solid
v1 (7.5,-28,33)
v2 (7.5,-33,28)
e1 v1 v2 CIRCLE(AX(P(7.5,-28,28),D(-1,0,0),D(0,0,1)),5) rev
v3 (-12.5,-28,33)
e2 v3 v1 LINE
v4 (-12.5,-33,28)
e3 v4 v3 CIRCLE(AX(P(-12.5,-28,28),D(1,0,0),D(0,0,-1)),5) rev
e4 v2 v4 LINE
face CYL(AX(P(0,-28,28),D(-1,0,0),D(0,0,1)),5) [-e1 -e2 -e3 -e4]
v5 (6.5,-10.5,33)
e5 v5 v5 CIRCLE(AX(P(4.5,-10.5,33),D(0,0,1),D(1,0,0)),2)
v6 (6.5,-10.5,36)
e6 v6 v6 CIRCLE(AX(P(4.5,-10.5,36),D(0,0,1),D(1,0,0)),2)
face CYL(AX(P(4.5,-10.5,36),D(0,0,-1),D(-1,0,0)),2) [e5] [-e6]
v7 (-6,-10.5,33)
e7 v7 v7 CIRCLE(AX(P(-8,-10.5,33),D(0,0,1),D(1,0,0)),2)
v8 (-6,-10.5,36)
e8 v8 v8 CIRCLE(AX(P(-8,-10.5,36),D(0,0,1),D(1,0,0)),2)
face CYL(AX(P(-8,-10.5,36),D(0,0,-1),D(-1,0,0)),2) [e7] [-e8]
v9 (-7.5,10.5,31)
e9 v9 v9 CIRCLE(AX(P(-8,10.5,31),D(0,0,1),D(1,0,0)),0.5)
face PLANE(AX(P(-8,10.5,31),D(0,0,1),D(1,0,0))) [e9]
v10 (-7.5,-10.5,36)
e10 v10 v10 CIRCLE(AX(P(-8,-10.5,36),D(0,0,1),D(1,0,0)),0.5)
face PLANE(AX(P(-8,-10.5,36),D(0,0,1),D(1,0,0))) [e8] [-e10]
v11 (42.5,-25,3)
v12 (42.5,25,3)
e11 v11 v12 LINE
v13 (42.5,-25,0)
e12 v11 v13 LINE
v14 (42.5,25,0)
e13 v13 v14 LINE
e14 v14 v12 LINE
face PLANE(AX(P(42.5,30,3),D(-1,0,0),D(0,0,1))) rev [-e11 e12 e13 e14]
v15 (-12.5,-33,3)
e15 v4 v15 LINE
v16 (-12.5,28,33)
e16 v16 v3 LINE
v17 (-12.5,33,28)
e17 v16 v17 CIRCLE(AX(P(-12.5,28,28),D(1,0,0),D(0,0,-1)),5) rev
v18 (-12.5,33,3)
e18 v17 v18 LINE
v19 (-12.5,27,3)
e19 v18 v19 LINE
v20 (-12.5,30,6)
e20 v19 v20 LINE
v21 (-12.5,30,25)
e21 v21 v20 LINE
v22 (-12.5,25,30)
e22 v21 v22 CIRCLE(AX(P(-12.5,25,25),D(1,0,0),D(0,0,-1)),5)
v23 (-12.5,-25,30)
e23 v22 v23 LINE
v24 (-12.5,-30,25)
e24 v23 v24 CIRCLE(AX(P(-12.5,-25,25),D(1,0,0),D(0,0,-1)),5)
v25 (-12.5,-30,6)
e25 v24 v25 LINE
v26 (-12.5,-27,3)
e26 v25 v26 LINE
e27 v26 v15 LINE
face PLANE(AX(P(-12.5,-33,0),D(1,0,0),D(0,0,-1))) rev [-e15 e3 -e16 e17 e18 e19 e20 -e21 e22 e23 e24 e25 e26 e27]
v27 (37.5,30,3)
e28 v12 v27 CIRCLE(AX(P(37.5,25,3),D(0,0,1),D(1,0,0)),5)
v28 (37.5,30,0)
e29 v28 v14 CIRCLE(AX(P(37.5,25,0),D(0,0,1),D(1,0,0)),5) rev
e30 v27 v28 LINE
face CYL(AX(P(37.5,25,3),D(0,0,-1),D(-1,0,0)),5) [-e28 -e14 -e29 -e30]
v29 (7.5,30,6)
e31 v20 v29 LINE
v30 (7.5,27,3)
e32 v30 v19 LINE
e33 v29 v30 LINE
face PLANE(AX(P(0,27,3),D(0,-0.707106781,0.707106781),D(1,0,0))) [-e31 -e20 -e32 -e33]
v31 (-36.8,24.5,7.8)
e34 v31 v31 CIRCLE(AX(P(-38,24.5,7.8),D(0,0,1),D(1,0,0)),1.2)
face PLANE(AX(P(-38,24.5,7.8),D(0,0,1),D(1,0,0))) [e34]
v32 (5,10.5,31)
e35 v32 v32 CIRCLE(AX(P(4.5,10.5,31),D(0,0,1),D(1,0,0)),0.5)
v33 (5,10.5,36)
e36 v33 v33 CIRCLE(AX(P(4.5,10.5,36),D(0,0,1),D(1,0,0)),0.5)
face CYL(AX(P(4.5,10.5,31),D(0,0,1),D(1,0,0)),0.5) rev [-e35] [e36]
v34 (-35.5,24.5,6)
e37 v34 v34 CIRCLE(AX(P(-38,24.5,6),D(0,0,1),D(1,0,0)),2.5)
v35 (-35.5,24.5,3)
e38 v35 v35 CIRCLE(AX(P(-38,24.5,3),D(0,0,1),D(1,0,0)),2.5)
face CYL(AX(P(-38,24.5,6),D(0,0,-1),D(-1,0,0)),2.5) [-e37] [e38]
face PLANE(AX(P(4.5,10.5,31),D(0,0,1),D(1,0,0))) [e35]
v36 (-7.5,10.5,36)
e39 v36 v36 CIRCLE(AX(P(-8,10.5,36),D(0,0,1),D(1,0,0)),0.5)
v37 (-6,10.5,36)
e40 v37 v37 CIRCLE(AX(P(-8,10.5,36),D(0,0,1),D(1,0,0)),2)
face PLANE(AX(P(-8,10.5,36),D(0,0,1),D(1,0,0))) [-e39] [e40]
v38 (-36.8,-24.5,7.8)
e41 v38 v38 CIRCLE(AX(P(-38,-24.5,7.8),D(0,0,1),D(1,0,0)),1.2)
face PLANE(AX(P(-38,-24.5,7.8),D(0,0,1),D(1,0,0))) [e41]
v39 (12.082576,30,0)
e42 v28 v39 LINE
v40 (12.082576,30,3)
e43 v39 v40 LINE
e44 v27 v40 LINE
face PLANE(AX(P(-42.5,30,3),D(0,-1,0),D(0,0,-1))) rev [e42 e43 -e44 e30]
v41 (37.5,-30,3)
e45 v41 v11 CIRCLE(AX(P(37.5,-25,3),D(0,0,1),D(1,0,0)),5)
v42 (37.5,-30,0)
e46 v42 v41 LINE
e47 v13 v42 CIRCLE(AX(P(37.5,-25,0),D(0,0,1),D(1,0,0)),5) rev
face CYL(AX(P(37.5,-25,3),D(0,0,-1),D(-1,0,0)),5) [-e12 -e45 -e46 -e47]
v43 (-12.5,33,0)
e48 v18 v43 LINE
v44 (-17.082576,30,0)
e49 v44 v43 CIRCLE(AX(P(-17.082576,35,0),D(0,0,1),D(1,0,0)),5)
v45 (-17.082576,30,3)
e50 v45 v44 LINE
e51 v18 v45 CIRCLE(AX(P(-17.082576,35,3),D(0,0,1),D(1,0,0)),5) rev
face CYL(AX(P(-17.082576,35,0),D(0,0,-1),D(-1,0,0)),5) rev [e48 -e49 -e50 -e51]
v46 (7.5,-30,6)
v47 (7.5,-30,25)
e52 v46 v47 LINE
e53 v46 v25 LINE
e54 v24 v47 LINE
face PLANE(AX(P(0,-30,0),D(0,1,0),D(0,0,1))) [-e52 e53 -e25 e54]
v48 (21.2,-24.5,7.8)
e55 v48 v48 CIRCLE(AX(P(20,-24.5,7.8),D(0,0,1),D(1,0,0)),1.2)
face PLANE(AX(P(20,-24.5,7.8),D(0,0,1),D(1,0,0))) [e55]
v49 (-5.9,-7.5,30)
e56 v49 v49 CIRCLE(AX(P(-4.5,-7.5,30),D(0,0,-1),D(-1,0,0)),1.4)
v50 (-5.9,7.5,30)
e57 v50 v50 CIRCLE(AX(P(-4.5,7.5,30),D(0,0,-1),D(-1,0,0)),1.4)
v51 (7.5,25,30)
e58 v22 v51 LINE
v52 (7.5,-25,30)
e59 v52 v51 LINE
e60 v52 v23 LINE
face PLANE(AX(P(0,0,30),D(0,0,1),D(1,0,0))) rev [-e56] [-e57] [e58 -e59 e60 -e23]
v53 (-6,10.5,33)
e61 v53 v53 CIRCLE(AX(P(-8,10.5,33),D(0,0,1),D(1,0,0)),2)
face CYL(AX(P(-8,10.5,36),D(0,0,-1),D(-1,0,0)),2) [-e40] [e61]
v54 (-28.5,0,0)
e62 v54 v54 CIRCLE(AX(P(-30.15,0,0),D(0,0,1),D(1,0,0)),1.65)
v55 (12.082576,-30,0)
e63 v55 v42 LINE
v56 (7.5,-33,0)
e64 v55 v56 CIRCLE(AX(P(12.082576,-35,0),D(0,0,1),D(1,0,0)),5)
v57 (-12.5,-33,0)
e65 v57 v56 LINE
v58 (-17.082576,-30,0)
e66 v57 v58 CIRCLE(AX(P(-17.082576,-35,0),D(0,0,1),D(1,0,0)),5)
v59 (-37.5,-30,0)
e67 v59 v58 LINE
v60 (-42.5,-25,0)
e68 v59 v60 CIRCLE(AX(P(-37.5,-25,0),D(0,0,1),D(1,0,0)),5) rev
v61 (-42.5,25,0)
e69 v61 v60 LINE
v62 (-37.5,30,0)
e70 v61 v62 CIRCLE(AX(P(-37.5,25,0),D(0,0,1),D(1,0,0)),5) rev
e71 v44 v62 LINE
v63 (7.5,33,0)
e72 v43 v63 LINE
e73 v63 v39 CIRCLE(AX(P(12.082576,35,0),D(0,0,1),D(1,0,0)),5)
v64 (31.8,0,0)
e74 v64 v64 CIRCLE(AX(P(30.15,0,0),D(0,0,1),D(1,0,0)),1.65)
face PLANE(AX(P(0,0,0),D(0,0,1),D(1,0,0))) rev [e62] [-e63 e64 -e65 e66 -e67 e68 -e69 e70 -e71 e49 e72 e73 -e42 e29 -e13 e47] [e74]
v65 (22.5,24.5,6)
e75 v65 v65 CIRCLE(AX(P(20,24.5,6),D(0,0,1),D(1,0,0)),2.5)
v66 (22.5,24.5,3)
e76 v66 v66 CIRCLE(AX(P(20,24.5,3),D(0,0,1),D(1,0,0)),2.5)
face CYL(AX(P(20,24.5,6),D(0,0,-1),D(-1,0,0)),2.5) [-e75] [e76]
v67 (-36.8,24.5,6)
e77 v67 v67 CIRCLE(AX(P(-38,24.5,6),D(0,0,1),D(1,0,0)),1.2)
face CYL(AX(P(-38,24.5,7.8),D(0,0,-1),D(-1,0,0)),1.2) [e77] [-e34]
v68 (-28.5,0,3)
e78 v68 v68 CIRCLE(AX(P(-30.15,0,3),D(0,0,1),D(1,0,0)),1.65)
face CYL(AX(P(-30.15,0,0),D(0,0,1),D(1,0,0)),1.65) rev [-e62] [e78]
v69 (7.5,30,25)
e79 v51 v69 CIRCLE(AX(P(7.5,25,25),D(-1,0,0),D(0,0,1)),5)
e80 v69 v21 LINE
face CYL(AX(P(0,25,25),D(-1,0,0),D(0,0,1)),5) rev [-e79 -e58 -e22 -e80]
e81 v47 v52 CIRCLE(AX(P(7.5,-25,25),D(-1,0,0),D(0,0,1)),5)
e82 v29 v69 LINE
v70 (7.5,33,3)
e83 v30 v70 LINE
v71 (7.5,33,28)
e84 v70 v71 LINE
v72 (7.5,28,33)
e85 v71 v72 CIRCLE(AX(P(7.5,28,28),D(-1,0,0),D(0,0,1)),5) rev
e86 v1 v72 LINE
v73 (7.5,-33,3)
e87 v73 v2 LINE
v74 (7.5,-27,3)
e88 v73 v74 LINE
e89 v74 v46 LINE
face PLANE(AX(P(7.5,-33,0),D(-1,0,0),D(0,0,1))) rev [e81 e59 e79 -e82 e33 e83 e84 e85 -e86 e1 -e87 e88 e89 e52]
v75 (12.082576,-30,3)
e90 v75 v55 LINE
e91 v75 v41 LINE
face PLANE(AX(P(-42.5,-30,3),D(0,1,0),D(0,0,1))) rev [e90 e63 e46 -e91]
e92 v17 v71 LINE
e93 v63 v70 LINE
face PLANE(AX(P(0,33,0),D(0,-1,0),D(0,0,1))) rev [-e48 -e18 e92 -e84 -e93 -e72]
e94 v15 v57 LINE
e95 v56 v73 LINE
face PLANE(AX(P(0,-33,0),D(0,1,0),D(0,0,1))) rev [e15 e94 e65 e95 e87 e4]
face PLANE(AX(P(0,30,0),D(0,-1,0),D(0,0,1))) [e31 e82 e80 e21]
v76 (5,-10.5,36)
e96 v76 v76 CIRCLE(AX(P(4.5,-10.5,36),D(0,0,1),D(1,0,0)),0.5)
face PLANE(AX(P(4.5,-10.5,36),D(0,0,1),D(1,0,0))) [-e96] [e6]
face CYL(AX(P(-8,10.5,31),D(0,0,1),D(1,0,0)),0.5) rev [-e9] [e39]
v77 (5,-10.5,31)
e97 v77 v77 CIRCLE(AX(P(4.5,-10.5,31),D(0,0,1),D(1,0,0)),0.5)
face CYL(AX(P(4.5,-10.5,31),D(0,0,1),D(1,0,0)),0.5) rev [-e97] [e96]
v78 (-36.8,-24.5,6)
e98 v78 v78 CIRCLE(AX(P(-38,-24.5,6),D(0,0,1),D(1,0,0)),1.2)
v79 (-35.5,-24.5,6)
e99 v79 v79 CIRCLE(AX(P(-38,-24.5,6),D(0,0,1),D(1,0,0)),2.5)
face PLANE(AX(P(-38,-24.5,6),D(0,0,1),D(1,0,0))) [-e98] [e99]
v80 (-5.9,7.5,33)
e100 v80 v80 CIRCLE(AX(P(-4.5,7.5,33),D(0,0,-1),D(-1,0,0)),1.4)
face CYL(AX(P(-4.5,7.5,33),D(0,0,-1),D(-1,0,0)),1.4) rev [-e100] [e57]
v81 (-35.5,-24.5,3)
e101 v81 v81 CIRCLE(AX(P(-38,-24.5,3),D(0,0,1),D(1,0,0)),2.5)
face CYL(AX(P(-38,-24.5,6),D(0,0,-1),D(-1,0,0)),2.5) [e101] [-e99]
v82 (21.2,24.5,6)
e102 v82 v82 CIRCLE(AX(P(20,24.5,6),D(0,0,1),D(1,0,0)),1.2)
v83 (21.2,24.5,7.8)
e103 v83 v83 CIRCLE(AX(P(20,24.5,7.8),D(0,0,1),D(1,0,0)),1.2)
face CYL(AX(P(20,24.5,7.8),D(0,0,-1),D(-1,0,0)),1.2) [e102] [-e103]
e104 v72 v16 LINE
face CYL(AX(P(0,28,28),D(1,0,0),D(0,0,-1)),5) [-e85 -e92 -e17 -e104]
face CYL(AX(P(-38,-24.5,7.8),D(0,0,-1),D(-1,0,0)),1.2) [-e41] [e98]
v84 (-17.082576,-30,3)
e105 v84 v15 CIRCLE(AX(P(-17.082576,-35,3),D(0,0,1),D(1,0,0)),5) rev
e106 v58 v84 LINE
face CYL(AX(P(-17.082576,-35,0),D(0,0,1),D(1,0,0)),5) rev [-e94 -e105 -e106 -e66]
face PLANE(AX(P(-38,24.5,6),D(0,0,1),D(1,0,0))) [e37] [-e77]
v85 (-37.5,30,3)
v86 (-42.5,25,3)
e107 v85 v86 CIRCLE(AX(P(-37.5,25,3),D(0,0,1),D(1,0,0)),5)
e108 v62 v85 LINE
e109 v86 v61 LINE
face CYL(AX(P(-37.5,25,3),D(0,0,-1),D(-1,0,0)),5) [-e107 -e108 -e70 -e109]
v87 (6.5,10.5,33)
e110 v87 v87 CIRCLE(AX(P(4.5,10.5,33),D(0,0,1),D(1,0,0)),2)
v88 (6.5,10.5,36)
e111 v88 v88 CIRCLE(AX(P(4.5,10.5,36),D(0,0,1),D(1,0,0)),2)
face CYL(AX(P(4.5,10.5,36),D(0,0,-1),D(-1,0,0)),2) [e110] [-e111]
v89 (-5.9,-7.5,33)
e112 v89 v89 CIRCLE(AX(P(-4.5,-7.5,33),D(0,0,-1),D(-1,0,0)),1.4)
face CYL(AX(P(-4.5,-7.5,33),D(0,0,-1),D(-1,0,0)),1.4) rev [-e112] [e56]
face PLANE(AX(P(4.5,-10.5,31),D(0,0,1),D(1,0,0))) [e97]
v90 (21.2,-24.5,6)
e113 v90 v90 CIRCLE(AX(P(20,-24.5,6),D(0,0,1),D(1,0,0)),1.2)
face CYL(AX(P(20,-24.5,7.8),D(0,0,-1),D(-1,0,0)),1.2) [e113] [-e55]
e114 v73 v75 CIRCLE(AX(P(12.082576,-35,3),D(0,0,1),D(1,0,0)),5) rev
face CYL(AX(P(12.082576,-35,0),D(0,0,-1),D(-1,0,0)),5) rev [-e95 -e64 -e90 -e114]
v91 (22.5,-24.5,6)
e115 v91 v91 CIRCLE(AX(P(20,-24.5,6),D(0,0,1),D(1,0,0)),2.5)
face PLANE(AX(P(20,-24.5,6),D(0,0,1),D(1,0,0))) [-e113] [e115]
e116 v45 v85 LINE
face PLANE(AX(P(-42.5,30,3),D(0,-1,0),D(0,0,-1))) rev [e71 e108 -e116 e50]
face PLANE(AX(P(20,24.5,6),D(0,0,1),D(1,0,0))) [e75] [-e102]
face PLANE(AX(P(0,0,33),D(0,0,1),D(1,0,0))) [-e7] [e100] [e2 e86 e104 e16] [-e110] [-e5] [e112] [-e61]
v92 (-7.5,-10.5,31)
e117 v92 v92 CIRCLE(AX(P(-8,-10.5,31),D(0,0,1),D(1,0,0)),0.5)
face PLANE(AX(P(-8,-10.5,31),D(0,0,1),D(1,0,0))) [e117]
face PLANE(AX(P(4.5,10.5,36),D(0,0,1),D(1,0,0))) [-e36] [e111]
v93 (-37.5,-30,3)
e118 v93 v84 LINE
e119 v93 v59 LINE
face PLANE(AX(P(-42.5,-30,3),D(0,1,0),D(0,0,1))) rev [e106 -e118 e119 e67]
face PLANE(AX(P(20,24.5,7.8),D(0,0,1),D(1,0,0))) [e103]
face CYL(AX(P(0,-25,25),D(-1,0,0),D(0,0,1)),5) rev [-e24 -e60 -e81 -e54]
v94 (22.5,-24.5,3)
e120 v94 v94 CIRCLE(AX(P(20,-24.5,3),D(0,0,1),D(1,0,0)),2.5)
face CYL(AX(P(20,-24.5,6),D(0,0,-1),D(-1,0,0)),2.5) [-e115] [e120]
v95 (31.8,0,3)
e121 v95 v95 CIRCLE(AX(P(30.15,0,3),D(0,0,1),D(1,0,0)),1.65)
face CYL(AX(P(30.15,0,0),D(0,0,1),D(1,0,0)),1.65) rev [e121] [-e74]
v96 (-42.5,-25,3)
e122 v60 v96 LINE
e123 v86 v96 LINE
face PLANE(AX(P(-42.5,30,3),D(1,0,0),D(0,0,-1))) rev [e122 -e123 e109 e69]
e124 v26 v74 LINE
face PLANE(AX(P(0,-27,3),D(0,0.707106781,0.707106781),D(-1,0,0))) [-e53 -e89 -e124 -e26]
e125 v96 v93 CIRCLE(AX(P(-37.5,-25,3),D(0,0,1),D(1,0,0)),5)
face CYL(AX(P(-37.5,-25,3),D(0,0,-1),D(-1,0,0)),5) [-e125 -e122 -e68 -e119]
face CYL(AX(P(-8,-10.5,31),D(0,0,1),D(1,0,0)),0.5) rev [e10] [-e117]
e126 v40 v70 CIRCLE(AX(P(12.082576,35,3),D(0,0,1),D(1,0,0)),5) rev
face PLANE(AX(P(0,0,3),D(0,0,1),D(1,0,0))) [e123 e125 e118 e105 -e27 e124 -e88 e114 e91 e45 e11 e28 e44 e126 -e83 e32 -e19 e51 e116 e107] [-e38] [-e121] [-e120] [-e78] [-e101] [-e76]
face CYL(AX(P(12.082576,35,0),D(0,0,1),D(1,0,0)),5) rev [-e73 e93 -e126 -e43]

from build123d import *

# Parameters (mm, degrees)
SKETCH1_W           = 85
SKETCH1_H           = 60
BOSS_EXTRUDE1_DEPTH = 3
SKETCH2_R           = 2.5
BOSS_EXTRUDE2_DEPTH = 3
SKETCH3_R           = 1.2
BOSS_EXTRUDE3_DEPTH = 1.8
SKETCH5_W           = 20
SKETCH5_H           = 30
BOSS_EXTRUDE4_DEPTH = 3
SKETCH6_W           = 20
SKETCH6_H           = 66
BOSS_EXTRUDE5_DEPTH = 3
SKETCH7_R           = 2
BOSS_EXTRUDE6_DEPTH = 3
SKETCH8_R           = 0.5
CUT_EXTRUDE2_DEPTH  = 5
SKETCH9_R           = 1.65
CUT_EXTRUDE3_DEPTH  = 3
FILLET1_R           = 5
CHAMFER1_SIZE       = 3
SKETCH10_R          = 1.4
CUT_EXTRUDE4_DEPTH  = 3


with BuildPart() as part:
    # Sketch1 → Boss-Extrude1 (new body)
    with BuildSketch(Plane.XY):
        Rectangle(SKETCH1_W, SKETCH1_H)
    extrude(amount=BOSS_EXTRUDE1_DEPTH)

    # Sketch2 → Boss-Extrude2 (add)
    with BuildSketch(Plane.XY.offset(3)):
        with Locations((-38, -24.5)):
            Circle(SKETCH2_R)
        with Locations((-38, 24.5)):
            Circle(SKETCH2_R)
        with Locations((20, 24.5)):
            Circle(SKETCH2_R)
        with Locations((20, -24.5)):
            Circle(SKETCH2_R)
    extrude(amount=BOSS_EXTRUDE2_DEPTH)

    # Sketch3 → Boss-Extrude3 (add)
    with BuildSketch(Plane.XY.offset(6)):
        with Locations((-38, 24.5)):
            Circle(SKETCH3_R)
        with Locations((20, 24.5)):
            Circle(SKETCH3_R)
        with Locations((-38, -24.5)):
            Circle(SKETCH3_R)
        with Locations((20, -24.5)):
            Circle(SKETCH3_R)
    extrude(amount=BOSS_EXTRUDE3_DEPTH)

    # Sketch5 → Boss-Extrude4 (add)
    with BuildSketch(Plane.XZ.offset(30)):
        with Locations((-2.5, 15)):
            Rectangle(SKETCH5_W, SKETCH5_H)
    boss_extrude4 = extrude(amount=BOSS_EXTRUDE4_DEPTH)

    # Mirror1: Boss-Extrude4 across plane
    add(boss_extrude4.mirror(Plane.ZX))

    # Sketch6 → Boss-Extrude5 (add)
    with BuildSketch(Plane.XY.offset(30)):
        with Locations((-2.5, 0)):
            Rectangle(SKETCH6_W, SKETCH6_H)
    extrude(amount=BOSS_EXTRUDE5_DEPTH)

    # Sketch7 → Boss-Extrude6 (add)
    with BuildSketch(Plane.XY.offset(33)):
        with Locations((-8, -10.5)):
            Circle(SKETCH7_R)
        with Locations((4.5, -10.5)):
            Circle(SKETCH7_R)
        with Locations((-8, 10.5)):
            Circle(SKETCH7_R)
        with Locations((4.5, 10.5)):
            Circle(SKETCH7_R)
    extrude(amount=BOSS_EXTRUDE6_DEPTH)

    # Sketch8 → Cut-Extrude2 (cut)
    with BuildSketch(Plane.XY.offset(36)):
        with Locations((-8, 10.5)):
            Circle(SKETCH8_R)
        with Locations((4.5, 10.5)):
            Circle(SKETCH8_R)
        with Locations((-8, -10.5)):
            Circle(SKETCH8_R)
        with Locations((4.5, -10.5)):
            Circle(SKETCH8_R)
    extrude(amount=-CUT_EXTRUDE2_DEPTH, mode=Mode.SUBTRACT)

    # Sketch9 → Cut-Extrude3 (cut)
    with BuildSketch(Plane.XY.offset(3)):
        with Locations((-30.15, 0)):
            Circle(SKETCH9_R)
        with Locations((30.15, 0)):
            Circle(SKETCH9_R)
    extrude(amount=-CUT_EXTRUDE3_DEPTH, mode=Mode.SUBTRACT)

    # Fillet1
    # the kernel refuses this fillet: 5 mm, written as the material it adds along each edge
    with BuildSketch(Plane(origin=(7.5, -30, 0), x_dir=(0, -1, 0), z_dir=(0, 0, 1)), Plane(origin=(-12.5, -30, 3), x_dir=(0, -1, 0), z_dir=(0, 0, -1))) as fillet1_piece_1:
        with BuildLine():
            CenterArc((5, 4.582575695), FILLET1_R, 180, 66.421821522)
            Line((0, 4.582575695), (0, 0))
            Line((0, 0), (3, 0))
        make_face()
    extrude(amount=3)
    with BuildSketch(Plane(origin=(-12.5, 30, 3), x_dir=(-1, 0, 0), z_dir=(0, 0, -1))) as fillet1_piece_2:
        with BuildLine():
            CenterArc((4.582575695, 5), FILLET1_R, 203.578178478, 66.421821522)
            Line((0, 3), (0, 0))
            Line((0, 0), (4.582575695, 0))
        make_face()
    extrude(amount=3)
    with BuildSketch(Plane(origin=(7.5, 30, 0), x_dir=(0, 1, 0), z_dir=(0, 0, 1))) as fillet1_piece_3:
        with BuildLine():
            CenterArc((5, -4.582575695), FILLET1_R, 113.578178478, 66.421821522)
            Line((0, -4.582575695), (0, 0))
            Line((0, 0), (3, 0))
        make_face()
    extrude(amount=3)
    with BuildSketch(Plane(origin=(7.5, -30, 30), x_dir=(0, 1, 0), z_dir=(-1, 0, 0)), Plane(origin=(7.5, 30, 30), x_dir=(0, 0, -1), z_dir=(-1, 0, 0))) as fillet1_piece_4:
        with BuildLine():
            CenterArc((FILLET1_R, FILLET1_R), FILLET1_R, 180, 90)
            Line((0, FILLET1_R), (0, 0))
            Line((0, 0), (FILLET1_R, 0))
        make_face()
    extrude(amount=20)
    # the kernel refuses this fillet: 5 mm, written as the material it takes off along each edge
    with BuildSketch(Plane(origin=(42.5, 30, -12.5), x_dir=(-1, 0, 0), z_dir=(0, 0, 1)), Plane(origin=(42.5, -30, -12.5), x_dir=(0, 1, 0), z_dir=(0, 0, 1))) as fillet1_2_piece_1:
        with BuildLine():
            CenterArc((FILLET1_R, FILLET1_R), FILLET1_R, 180, 90)
            Line((0, FILLET1_R), (0, 0))
            Line((0, 0), (FILLET1_R, 0))
        make_face()
    extrude(amount=28, mode=Mode.SUBTRACT)
    with BuildSketch(Plane(origin=(-42.5, 30, -12.5), x_dir=(1, 0, 0), z_dir=(0, 0, 1)), Plane(origin=(-42.5, -30, -12.5), x_dir=(0, 1, 0), z_dir=(0, 0, 1))) as fillet1_2_piece_2:
        with BuildLine():
            CenterArc((FILLET1_R, -FILLET1_R), FILLET1_R, 90, 90)
            Line((0, -FILLET1_R), (0, 0))
            Line((0, 0), (FILLET1_R, 0))
        make_face()
    extrude(amount=28, mode=Mode.SUBTRACT)
    with BuildSketch(Plane(origin=(20, -33, 33), x_dir=(0, 0, -1), z_dir=(-1, 0, 0)), Plane(origin=(-25, 33, 33), x_dir=(0, 0, -1), z_dir=(1, 0, 0))) as fillet1_2_piece_3:
        with BuildLine():
            CenterArc((FILLET1_R, -FILLET1_R), FILLET1_R, 90, 90)
            Line((0, -FILLET1_R), (0, 0))
            Line((0, 0), (FILLET1_R, 0))
        make_face()
    extrude(amount=45, mode=Mode.SUBTRACT)

    # Chamfer1
    chamfer1_edges = [part.edges().sort_by_distance(p)[0] for p in [
        (-2.5, -30, 3),
        (-2.5, 30, 3),
    ]]
    chamfer(chamfer1_edges, length=CHAMFER1_SIZE)

    # Sketch10 → Cut-Extrude4 (cut)
    with BuildSketch(Plane(origin=(0, 0, 30), x_dir=(-1, 0, 0), z_dir=(0, 0, -1))):
        with Locations((4.5, -7.5)):
            Circle(SKETCH10_R)
        with Locations((4.5, 7.5)):
            Circle(SKETCH10_R)
    extrude(amount=-CUT_EXTRUDE4_DEPTH, mode=Mode.SUBTRACT)


solid = part.part
